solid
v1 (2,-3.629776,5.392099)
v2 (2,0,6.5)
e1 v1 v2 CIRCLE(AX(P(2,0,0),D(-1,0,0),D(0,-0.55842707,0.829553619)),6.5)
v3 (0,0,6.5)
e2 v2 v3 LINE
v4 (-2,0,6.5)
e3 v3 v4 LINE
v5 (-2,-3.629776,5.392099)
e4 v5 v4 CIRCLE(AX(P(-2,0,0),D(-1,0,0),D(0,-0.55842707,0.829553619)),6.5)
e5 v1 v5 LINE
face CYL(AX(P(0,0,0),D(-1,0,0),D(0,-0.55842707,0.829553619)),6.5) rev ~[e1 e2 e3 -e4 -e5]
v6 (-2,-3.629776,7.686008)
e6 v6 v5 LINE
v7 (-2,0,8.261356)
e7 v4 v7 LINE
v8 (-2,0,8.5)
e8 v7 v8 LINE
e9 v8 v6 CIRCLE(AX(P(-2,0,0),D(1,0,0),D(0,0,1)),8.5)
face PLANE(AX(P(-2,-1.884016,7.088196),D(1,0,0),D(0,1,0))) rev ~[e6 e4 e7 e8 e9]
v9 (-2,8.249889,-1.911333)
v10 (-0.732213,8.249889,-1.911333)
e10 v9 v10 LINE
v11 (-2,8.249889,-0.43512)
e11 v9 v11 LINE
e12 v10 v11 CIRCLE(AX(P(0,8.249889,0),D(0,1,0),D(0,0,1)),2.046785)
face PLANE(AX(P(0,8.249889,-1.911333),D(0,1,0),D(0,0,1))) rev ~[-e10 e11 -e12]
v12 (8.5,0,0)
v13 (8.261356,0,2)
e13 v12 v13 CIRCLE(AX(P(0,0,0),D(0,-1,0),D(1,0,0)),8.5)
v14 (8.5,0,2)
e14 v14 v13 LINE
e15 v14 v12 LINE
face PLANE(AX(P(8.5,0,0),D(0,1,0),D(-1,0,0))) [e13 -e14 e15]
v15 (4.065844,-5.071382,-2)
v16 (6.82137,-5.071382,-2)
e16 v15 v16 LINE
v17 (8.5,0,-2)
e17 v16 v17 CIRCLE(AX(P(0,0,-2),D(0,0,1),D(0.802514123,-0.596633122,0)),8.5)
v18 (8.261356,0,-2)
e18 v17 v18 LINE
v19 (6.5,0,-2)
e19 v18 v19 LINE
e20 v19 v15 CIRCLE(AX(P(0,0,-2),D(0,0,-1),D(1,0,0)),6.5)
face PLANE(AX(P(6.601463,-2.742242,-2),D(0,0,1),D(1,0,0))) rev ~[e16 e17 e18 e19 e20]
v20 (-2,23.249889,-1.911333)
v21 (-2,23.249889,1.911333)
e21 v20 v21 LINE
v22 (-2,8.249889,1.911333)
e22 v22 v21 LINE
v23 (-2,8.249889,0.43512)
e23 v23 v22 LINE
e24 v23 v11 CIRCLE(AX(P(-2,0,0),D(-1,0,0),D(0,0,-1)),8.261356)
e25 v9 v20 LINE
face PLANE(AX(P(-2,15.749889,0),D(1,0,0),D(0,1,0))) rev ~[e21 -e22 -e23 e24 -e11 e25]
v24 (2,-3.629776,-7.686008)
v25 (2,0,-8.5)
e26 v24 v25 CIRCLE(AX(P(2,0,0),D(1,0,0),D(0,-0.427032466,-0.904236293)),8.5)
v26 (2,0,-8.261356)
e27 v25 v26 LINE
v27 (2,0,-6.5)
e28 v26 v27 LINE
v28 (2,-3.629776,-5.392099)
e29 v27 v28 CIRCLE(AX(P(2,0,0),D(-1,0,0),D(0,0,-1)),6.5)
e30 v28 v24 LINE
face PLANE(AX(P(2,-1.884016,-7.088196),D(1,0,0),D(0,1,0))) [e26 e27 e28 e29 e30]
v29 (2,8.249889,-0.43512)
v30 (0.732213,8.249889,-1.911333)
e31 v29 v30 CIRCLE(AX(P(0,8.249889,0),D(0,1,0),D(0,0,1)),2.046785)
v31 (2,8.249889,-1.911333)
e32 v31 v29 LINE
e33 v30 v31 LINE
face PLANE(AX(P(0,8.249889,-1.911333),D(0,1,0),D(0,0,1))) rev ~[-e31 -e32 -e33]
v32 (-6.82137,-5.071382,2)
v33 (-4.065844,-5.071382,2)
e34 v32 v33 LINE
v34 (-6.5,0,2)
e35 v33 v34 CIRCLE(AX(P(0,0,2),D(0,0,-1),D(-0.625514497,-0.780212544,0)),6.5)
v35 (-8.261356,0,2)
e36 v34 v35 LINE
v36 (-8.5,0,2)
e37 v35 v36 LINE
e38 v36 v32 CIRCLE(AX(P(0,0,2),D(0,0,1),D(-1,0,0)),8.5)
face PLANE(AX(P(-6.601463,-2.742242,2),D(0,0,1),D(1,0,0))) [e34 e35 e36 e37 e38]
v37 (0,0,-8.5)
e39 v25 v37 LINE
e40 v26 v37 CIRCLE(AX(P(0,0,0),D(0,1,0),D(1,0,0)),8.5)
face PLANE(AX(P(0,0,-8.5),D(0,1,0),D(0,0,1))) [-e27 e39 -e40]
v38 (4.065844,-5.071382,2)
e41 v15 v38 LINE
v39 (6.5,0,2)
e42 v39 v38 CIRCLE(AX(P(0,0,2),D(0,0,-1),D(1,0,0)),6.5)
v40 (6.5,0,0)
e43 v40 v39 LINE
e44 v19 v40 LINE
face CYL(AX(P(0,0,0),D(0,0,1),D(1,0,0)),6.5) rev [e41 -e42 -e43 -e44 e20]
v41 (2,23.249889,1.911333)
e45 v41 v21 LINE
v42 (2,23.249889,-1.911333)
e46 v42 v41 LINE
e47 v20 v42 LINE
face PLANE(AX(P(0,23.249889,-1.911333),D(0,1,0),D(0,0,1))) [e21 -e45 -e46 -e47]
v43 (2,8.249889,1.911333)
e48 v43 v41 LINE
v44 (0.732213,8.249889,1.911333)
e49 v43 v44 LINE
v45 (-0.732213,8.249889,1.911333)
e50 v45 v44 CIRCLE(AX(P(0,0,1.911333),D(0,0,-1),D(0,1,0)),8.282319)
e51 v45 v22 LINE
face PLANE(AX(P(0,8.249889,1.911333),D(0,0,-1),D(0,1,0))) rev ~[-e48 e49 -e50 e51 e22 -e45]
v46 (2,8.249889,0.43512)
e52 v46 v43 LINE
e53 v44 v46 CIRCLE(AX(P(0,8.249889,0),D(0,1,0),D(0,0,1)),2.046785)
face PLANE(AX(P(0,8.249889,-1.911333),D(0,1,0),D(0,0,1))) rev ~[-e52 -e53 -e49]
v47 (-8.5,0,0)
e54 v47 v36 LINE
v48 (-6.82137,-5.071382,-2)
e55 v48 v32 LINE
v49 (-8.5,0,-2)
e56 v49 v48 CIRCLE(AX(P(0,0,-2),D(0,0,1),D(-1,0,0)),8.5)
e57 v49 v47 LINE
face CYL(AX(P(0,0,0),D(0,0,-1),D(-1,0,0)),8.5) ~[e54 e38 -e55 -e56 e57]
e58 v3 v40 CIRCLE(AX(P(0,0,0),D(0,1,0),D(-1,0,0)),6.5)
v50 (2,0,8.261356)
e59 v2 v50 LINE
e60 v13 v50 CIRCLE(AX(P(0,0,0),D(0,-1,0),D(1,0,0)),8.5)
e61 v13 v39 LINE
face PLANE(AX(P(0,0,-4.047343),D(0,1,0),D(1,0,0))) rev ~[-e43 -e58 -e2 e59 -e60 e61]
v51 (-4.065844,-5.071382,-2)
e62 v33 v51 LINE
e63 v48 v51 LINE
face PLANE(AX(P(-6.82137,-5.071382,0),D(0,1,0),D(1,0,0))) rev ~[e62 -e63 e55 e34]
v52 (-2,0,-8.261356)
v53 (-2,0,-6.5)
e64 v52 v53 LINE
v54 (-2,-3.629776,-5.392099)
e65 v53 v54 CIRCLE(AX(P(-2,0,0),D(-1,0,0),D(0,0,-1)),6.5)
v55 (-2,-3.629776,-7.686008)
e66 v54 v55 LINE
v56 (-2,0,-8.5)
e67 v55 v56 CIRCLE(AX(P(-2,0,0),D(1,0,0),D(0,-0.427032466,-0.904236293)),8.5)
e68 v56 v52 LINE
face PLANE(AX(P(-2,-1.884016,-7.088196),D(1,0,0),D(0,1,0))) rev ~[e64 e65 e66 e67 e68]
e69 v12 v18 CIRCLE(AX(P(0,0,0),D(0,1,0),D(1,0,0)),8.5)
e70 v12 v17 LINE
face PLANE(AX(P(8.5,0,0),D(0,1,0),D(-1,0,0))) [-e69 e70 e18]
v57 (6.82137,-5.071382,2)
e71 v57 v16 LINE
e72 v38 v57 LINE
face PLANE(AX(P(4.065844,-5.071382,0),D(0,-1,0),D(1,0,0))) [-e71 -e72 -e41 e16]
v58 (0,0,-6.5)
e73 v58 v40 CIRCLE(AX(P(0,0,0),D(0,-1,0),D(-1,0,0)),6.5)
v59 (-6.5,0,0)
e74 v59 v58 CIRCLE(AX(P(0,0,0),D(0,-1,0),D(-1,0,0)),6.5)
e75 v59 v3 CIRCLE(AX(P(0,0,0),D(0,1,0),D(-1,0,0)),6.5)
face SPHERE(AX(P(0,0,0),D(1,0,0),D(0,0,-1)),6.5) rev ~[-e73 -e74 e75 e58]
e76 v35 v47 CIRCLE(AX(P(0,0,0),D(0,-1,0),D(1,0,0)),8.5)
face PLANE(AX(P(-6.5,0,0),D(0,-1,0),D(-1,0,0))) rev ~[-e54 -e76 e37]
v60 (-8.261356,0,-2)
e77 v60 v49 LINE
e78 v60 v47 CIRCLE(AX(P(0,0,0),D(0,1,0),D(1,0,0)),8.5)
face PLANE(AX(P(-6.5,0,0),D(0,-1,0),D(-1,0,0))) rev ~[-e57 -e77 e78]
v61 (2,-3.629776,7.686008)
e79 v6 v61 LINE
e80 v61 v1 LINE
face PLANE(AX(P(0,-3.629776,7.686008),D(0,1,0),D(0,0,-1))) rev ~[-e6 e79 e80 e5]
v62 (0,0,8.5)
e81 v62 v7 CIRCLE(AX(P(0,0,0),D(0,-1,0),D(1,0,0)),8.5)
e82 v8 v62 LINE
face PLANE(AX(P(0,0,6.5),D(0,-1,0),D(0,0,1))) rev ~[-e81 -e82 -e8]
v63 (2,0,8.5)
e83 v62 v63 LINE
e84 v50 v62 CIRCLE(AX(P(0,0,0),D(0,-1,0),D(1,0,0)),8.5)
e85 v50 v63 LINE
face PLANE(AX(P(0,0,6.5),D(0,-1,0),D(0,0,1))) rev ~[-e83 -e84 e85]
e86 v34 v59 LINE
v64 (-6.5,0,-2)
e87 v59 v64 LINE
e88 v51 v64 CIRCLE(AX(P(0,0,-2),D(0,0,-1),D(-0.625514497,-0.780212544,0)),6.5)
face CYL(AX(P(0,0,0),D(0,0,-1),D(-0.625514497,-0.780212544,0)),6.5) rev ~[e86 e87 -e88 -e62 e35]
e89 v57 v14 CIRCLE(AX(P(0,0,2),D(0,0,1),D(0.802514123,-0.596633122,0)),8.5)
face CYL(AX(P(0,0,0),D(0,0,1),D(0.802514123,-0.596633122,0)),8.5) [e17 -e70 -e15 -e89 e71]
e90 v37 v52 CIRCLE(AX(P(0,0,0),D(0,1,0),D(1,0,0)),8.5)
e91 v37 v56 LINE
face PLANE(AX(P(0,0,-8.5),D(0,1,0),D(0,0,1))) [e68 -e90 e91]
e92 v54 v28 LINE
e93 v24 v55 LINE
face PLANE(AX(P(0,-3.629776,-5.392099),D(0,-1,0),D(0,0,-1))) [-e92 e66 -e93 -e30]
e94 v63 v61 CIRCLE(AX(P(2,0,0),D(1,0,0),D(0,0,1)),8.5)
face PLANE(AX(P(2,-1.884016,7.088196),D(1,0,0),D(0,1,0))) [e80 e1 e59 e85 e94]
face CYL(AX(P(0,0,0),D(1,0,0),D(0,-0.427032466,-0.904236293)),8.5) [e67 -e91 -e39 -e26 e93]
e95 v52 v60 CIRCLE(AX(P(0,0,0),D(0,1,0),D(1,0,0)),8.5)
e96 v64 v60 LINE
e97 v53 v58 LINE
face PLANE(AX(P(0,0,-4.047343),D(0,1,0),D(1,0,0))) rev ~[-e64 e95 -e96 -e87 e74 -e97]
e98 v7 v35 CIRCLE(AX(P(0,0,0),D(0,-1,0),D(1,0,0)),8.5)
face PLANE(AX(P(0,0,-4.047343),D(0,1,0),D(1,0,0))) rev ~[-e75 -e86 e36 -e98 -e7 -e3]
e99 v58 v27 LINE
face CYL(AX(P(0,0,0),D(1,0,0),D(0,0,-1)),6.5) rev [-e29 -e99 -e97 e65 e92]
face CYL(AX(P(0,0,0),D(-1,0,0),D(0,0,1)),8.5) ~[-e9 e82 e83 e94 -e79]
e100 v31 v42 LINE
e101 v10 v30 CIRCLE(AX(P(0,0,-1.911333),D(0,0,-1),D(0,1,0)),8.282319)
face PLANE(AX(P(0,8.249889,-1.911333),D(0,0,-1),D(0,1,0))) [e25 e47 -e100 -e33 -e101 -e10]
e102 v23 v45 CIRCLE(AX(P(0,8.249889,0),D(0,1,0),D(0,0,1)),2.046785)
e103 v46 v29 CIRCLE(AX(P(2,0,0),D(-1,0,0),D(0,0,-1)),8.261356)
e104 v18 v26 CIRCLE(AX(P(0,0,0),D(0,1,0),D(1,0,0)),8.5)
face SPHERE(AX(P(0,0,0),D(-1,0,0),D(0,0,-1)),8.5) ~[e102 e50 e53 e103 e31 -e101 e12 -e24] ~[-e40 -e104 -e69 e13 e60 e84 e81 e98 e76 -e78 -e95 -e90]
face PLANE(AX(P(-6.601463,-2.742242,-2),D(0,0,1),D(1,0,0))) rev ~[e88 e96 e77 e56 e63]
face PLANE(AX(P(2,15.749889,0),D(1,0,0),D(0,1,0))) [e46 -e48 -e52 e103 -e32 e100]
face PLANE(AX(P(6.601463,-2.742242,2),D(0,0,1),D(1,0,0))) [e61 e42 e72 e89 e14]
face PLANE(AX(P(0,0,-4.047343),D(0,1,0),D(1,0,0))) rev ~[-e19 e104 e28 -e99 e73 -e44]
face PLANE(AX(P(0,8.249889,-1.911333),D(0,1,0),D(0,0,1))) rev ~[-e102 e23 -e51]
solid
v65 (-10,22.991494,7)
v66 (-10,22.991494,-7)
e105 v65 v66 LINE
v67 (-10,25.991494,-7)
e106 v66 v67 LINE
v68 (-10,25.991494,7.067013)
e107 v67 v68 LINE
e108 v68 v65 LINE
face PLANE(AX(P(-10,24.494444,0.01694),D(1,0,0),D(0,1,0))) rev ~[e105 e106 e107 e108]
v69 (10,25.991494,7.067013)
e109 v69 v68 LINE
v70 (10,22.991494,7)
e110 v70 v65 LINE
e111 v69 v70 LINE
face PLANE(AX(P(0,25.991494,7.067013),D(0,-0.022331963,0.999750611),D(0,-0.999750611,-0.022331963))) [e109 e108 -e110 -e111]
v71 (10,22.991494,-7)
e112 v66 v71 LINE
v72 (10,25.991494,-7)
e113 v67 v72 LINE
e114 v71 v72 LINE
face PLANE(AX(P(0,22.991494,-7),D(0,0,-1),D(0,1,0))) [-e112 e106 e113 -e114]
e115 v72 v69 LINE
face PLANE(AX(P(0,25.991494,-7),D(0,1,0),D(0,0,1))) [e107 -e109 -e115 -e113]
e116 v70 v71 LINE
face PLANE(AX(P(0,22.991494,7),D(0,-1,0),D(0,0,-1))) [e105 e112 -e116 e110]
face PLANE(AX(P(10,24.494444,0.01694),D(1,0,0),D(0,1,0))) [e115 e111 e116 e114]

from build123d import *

# Parameters (mm, degrees)
F1_ANGLE_BACK = 90
F1_ANGLE      = 180
F3_DEPTH      = 2
F5_DEPTH      = 2
F6_W          = 15
F6_H          = 3.8226658944
F7_DEPTH      = 2
F9_DEPTH      = 10


# Not quite as in the source:
# - the program builds the solid bodies; features that only make, move or delete a surface that nothing else refers to are left out


with BuildPart() as f1:
    # F0 (on Top) → F1 (revolve)
    with BuildSketch(Plane.XY, mode=Mode.PRIVATE) as f1_sk:
        with BuildLine():
            ThreePointArc((-6.5, 0), (0, 6.5), (6.5, 0))
            Line((6.5, 0), (8.5, 0))
            ThreePointArc((8.5, 0), (0, 8.5), (-8.5, 0))
            Line((-8.5, 0), (-6.5, 0))
        make_face()
    revolve(f1_sk.sketch.rotate(Axis((7.5, 0, 0), (1, 0, 0)), -F1_ANGLE_BACK), axis=Axis((7.5, 0, 0), (1, 0, 0)), revolution_arc=F1_ANGLE)

    # F2 (on Top) → F3 (join, symmetric)
    with BuildSketch(Plane.XY):
        with BuildLine():
            Line((-6.5, 0), (-8.5, 0))
            ThreePointArc((-8.5, 0), (-8.06943757, -2.6709880764), (-6.8213700461, -5.0713815371))
            Line((-6.8213700461, -5.0713815371), (-4.0658442304, -5.0713815371))
            ThreePointArc((-4.0658442304, -5.0713815371), (-5.8599482718, -2.8126511073), (-6.5, 0))
        make_face()
        with BuildLine():
            Line((8.5, 0), (6.5, 0))
            ThreePointArc((6.5, 0), (5.8599482718, -2.8126511073), (4.0658442304, -5.0713815371))
            Line((4.0658442304, -5.0713815371), (6.8213700461, -5.0713815371))
            ThreePointArc((6.8213700461, -5.0713815371), (8.06943757, -2.6709880764), (8.5, 0))
        make_face()
    extrude(amount=F3_DEPTH, both=True)

    # F4 (on Right) → F5 (join, symmetric)
    with BuildSketch(Plane.YZ):
        with BuildLine():
            Line((0, 6.5), (0, 8.5))
            ThreePointArc((0, 8.5), (-1.8599634185, 8.2940060334), (-3.6297759564, 7.6860084898))
            Line((-3.6297759564, 7.6860084898), (-3.6297759564, 5.3920985253))
            ThreePointArc((-3.6297759564, 5.3920985253), (-1.8975457288, 6.2168577438), (0, 6.5))
        make_face()
        with BuildLine():
            Line((0, -8.5), (0, -6.5))
            ThreePointArc((0, -6.5), (-1.8975457288, -6.2168577438), (-3.6297759564, -5.3920985253))
            Line((-3.6297759564, -5.3920985253), (-3.6297759564, -7.6860084898))
            ThreePointArc((-3.6297759564, -7.6860084898), (-1.8599634185, -8.2940060334), (0, -8.5))
        make_face()
    extrude(amount=F5_DEPTH, both=True)

    # F6 (on Right) → F7 (join, symmetric)
    with BuildSketch(Plane.YZ):
        with Locations((15.7498891279, 0)):
            Rectangle(F6_W, F6_H)
    extrude(amount=F7_DEPTH, both=True)


with BuildPart() as f9:
    # F8 (on Right) → F9 (new body, symmetric)
    with BuildSketch(Plane.YZ):
        Polygon((22.991493836, 7), (22.991493836, 0), (22.991493836, -7), (25.991493836, -7), (25.991493836, 7.0670126006), align=None)
    extrude(amount=F9_DEPTH, both=True)


solid = Compound([f1.part, f9.part])
